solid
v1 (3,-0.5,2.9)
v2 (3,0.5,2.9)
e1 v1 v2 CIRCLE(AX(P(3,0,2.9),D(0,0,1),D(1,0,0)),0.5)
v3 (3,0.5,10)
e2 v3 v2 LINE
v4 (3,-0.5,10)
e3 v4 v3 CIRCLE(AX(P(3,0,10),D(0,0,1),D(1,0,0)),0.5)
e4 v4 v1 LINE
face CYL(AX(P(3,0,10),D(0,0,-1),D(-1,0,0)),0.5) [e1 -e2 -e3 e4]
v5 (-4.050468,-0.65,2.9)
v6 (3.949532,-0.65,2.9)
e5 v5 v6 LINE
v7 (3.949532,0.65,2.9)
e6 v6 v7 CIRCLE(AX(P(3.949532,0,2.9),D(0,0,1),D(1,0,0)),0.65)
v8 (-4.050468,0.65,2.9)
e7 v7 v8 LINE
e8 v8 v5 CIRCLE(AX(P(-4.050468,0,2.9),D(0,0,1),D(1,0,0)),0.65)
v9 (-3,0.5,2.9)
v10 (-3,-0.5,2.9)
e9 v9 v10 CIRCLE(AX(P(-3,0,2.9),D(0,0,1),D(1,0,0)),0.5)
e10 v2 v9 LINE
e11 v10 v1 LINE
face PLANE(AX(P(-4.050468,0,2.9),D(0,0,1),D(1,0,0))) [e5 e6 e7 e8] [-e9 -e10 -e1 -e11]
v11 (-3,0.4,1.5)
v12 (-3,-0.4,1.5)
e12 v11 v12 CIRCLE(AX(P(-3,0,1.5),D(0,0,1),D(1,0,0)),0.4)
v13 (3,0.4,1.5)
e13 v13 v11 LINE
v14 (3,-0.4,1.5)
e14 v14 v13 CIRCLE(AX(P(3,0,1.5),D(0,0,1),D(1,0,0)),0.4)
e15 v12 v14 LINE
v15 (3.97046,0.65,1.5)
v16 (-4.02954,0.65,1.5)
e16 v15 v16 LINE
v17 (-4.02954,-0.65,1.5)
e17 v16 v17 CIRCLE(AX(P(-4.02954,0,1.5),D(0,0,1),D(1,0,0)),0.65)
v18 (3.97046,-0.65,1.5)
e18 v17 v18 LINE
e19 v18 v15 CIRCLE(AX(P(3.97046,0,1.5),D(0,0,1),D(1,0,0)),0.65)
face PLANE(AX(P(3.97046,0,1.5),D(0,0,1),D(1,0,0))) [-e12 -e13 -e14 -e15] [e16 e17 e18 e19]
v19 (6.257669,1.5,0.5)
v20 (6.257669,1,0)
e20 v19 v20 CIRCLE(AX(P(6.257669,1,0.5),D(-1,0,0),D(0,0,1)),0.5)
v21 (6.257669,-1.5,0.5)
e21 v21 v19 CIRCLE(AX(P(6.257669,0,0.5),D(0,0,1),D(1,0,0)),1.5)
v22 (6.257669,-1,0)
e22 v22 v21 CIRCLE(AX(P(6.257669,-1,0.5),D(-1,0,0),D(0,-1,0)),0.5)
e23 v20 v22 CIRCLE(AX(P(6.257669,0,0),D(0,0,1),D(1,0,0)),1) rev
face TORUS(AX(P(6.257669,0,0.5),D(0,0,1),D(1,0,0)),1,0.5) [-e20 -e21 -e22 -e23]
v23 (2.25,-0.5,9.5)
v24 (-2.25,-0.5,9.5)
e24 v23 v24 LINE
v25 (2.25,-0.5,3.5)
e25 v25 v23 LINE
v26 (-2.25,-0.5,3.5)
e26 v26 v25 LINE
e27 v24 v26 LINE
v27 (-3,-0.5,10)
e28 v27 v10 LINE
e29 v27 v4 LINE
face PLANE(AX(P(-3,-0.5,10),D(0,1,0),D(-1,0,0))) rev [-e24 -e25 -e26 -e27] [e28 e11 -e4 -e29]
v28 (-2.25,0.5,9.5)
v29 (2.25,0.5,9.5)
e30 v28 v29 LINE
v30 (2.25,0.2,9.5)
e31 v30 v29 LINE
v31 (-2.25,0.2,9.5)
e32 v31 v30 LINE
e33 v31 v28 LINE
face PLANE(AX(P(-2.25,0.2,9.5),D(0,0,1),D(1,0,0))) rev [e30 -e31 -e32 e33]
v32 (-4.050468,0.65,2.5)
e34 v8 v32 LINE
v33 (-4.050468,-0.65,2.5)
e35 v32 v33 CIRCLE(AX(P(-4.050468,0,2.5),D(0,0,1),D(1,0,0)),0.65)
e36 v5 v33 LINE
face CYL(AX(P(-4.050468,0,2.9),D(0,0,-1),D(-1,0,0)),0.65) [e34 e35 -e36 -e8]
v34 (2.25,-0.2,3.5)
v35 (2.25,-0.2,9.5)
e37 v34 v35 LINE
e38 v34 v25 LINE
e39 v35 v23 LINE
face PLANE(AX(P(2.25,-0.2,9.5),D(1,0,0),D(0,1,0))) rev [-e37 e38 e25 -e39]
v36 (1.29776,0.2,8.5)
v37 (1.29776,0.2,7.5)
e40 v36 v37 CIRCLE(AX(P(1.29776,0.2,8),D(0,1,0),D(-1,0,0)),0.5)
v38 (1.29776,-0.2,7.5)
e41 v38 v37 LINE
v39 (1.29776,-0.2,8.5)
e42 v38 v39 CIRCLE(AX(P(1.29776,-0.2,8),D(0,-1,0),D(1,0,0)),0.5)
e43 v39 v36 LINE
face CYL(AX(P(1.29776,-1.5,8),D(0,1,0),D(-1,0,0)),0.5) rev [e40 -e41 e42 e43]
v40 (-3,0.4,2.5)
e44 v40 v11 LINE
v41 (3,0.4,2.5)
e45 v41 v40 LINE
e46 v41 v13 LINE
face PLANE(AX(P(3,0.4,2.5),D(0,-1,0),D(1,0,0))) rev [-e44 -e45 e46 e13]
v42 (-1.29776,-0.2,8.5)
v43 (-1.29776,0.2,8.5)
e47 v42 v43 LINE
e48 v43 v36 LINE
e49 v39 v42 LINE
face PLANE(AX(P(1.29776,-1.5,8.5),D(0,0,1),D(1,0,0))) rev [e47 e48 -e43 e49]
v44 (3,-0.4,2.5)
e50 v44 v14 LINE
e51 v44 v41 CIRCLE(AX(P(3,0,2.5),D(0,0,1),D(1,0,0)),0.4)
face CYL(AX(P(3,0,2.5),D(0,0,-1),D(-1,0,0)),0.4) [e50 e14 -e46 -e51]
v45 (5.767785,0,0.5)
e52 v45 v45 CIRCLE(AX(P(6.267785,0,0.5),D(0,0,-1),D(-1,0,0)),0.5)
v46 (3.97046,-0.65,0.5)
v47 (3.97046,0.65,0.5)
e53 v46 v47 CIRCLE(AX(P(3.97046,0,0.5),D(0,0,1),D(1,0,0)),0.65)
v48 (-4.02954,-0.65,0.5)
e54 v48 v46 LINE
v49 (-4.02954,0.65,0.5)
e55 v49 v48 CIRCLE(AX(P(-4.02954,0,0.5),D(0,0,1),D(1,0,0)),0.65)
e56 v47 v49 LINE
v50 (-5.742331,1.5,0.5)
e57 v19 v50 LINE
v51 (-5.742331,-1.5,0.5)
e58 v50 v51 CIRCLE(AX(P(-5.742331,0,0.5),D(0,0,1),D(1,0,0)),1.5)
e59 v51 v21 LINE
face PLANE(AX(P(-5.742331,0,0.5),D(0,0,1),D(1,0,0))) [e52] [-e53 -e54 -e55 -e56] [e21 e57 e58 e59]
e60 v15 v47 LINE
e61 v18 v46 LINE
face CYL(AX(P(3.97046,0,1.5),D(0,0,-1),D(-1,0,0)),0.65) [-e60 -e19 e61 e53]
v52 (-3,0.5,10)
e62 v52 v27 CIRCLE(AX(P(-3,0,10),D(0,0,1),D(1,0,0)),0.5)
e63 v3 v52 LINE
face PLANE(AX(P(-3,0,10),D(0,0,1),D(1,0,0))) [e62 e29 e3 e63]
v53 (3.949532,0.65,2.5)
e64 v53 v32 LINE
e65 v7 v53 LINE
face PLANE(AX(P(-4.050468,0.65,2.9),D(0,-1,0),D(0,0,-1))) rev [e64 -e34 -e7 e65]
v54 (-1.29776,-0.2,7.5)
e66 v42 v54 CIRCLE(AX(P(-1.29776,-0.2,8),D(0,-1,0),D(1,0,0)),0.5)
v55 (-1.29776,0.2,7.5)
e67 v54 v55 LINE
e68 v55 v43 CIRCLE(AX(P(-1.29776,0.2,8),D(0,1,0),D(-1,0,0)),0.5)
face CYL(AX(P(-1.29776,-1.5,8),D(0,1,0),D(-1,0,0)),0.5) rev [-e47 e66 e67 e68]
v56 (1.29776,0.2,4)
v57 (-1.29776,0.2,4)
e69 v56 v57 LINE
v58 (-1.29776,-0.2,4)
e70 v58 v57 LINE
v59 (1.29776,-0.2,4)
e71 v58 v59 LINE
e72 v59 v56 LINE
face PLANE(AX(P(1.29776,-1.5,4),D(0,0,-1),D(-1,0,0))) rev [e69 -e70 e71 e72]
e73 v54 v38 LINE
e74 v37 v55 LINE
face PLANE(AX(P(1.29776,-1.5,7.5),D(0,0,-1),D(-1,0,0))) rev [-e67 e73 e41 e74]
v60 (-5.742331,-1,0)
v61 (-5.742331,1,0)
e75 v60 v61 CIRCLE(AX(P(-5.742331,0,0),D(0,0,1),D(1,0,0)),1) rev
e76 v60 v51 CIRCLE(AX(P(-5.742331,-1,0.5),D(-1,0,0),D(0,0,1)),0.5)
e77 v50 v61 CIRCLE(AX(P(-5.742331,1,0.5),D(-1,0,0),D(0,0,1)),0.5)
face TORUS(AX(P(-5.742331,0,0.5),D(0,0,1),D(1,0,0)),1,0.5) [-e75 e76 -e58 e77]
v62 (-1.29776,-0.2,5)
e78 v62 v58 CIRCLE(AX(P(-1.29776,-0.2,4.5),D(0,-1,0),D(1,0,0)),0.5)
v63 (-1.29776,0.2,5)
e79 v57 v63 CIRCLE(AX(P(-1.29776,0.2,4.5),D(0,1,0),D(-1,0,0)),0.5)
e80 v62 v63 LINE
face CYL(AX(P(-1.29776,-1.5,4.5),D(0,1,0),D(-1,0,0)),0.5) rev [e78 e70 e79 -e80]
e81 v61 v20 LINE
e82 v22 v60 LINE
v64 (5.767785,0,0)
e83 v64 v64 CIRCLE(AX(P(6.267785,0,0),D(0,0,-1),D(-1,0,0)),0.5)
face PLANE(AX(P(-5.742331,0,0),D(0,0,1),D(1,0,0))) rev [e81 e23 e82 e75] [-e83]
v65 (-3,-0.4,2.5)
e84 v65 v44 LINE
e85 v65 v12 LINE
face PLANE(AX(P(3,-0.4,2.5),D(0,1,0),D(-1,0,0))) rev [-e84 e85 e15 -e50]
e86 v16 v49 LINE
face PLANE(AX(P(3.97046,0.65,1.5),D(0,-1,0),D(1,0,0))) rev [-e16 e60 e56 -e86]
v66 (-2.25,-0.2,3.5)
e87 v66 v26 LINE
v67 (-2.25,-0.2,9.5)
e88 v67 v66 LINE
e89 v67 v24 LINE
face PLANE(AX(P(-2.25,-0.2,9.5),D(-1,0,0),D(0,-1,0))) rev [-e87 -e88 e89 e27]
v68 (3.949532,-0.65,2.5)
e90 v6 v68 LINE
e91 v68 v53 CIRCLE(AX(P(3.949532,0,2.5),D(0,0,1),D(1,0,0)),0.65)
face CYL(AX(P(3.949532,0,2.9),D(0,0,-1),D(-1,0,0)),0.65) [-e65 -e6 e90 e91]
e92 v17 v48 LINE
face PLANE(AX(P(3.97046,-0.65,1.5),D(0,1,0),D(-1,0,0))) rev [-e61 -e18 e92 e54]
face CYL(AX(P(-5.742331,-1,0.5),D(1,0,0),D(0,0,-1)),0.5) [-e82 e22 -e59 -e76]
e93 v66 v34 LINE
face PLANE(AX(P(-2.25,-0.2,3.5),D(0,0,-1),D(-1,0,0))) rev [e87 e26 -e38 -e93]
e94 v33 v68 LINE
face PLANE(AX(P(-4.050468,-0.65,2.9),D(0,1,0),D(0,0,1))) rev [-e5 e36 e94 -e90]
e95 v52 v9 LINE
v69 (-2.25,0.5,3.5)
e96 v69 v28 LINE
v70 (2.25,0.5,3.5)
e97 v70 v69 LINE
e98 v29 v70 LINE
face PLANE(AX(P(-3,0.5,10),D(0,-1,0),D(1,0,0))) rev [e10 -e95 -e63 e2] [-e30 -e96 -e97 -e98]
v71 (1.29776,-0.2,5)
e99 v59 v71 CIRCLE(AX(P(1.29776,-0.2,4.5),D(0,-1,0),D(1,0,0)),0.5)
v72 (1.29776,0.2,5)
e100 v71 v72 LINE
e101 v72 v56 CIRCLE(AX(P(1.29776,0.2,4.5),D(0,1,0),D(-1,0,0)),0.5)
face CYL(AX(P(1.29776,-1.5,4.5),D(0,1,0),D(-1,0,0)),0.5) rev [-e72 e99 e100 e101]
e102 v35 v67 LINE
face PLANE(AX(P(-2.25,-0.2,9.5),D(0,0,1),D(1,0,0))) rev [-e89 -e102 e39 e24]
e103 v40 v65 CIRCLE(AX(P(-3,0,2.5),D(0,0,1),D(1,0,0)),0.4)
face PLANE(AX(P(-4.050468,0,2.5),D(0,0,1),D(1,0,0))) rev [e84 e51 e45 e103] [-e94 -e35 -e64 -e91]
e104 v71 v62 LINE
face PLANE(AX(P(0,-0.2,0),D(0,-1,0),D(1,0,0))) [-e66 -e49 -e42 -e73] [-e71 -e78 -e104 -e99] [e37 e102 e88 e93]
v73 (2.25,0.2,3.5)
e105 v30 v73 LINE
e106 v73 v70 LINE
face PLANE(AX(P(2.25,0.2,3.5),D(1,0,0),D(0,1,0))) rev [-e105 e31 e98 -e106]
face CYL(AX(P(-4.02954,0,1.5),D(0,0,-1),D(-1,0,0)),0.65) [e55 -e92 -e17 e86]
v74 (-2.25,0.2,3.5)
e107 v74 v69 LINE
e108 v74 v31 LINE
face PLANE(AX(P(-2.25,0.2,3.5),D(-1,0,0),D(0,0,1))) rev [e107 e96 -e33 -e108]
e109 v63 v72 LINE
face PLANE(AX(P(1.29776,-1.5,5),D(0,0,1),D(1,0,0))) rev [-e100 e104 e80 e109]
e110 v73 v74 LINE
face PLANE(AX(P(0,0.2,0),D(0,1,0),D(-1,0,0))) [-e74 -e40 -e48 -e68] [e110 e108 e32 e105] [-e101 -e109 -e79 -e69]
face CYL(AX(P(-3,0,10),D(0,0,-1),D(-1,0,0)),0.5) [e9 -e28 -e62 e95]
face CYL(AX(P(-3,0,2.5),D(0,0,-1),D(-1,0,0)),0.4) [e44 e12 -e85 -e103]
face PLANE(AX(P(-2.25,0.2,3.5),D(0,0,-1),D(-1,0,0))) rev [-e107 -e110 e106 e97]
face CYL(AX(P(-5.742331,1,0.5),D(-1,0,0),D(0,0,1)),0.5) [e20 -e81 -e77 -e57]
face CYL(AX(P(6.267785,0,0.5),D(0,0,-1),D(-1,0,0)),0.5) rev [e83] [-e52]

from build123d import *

# Parameters (mm, degrees)
EXTRUDE_2_DEPTH     = 0.5
SKETCH_6_R          = 0.5
CUT_EXTRUDE_1_DEPTH = 8.917160087
EXTRUDE_3_DEPTH     = 1
EXTRUDE_4_DEPTH     = 1
EXTRUDE_5_DEPTH     = 0.4
EXTRUDE_6_DEPTH     = 7.1
SKETCH_11_W         = 4.5
SKETCH_11_H         = 6
CUT_EXTRUDE_2_DEPTH = 0.3
SKETCH_13_W         = 4.5
SKETCH_13_H         = 6
CUT_EXTRUDE_3_DEPTH = 0.3
CUT_EXTRUDE_4_DEPTH = 13.769942202
FILLET_2_R          = 0.5


with BuildPart() as part:
    # 草图5 → 凸台-拉伸2 (new body)
    with BuildSketch(Plane.XY):
        with BuildLine():
            Line((-5.742331288, 1.5), (6.257668712, 1.5))
            ThreePointArc((6.257668712, 1.5), (7.757668712, 0), (6.257668712, -1.5))
            Line((6.257668712, -1.5), (-5.742331288, -1.5))
            ThreePointArc((-5.742331288, -1.5), (-7.242331288, 0), (-5.742331288, 1.5))
        make_face()
    extrude(amount=EXTRUDE_2_DEPTH)

    # 草图6 → 切除-拉伸1 (cut, through all)
    with BuildSketch(Plane(origin=(0, 0, 0), x_dir=(-1, 0, 0), z_dir=(0, 0, -1))):
        with Locations((-6.26778509, 0)):
            Circle(SKETCH_6_R)
    extrude(amount=-CUT_EXTRUDE_1_DEPTH, mode=Mode.SUBTRACT)

    # 草图7 → 凸台-拉伸3 (add)
    with BuildSketch(Plane.XY.offset(0.5)):
        with BuildLine():
            Line((3.97045961, -0.65), (-4.02954039, -0.65))
            ThreePointArc((-4.02954039, -0.65), (-4.67954039, 0), (-4.02954039, 0.65))
            Line((-4.02954039, 0.65), (3.97045961, 0.65))
            ThreePointArc((3.97045961, 0.65), (4.62045961, 0), (3.97045961, -0.65))
        make_face()
    extrude(amount=EXTRUDE_3_DEPTH)

    # 草图8 → 凸台-拉伸4 (add)
    with BuildSketch(Plane.XY.offset(1.5)):
        with BuildLine():
            Line((3, -0.4), (-3, -0.4))
            ThreePointArc((-3, -0.4), (-3.4, 0), (-3, 0.4))
            Line((-3, 0.4), (3, 0.4))
            ThreePointArc((3, 0.4), (3.4, 0), (3, -0.4))
        make_face()
    extrude(amount=EXTRUDE_4_DEPTH)

    # 草图9 → 凸台-拉伸5 (add)
    with BuildSketch(Plane.XY.offset(2.5)):
        with BuildLine():
            Line((-4.050467807, 0.65), (3.949532193, 0.65))
            ThreePointArc((3.949532193, 0.65), (4.599532193, 0), (3.949532193, -0.65))
            Line((3.949532193, -0.65), (-4.050467807, -0.65))
            ThreePointArc((-4.050467807, -0.65), (-4.700467807, 0), (-4.050467807, 0.65))
        make_face()
    extrude(amount=EXTRUDE_5_DEPTH)

    # 草图10 → 凸台-拉伸6 (add)
    with BuildSketch(Plane.XY.offset(2.9)):
        with BuildLine():
            Line((-3, 0.5), (3, 0.5))
            ThreePointArc((3, 0.5), (3.5, 0), (3, -0.5))
            Line((3, -0.5), (-3, -0.5))
            ThreePointArc((-3, -0.5), (-3.5, 0), (-3, 0.5))
        make_face()
    extrude(amount=EXTRUDE_6_DEPTH)

    # 草图11 → 切除-拉伸2 (cut)
    with BuildSketch(Plane(origin=(0, -0.5, 0), x_dir=(-1, 0, 0), z_dir=(0, -1, 0))):
        with Locations((0, -6.5)):
            Rectangle(SKETCH_11_W, SKETCH_11_H)
    extrude(amount=-CUT_EXTRUDE_2_DEPTH, mode=Mode.SUBTRACT)

    # 草图13 → 切除-拉伸3 (cut)
    with BuildSketch(Plane(origin=(0, 0.5, 0), x_dir=(1, 0, 0), z_dir=(0, 1, 0))):
        with Locations((0, -6.5)):
            Rectangle(SKETCH_13_W, SKETCH_13_H)
    extrude(amount=-CUT_EXTRUDE_3_DEPTH, mode=Mode.SUBTRACT)

    # 草图14 → 切除-拉伸4 (cut, through all)
    with BuildSketch(Plane(origin=(0, 0.2, 0), x_dir=(1, 0, 0), z_dir=(0, 1, 0))):
        with BuildLine():
            Line((1.297759643, -5), (-1.297759643, -5))
            ThreePointArc((-1.297759643, -5), (-1.797759643, -4.5), (-1.297759643, -4))
            Line((-1.297759643, -4), (1.297759643, -4))
            ThreePointArc((1.297759643, -4), (1.797759643, -4.5), (1.297759643, -5))
        make_face()
        with BuildLine():
            Line((1.297759643, -8.5), (-1.297759643, -8.5))
            ThreePointArc((-1.297759643, -8.5), (-1.797759643, -8), (-1.297759643, -7.5))
            Line((-1.297759643, -7.5), (1.297759643, -7.5))
            ThreePointArc((1.297759643, -7.5), (1.797759643, -8), (1.297759643, -8.5))
        make_face()
    extrude(amount=-CUT_EXTRUDE_4_DEPTH, mode=Mode.SUBTRACT)

    # 圆角2
    fillet_2_edges = [part.edges().sort_by_distance(p)[0] for p in [
        (-7.242331288, 0, 0),
        (0.257668712, 1.5, 0),
        (7.757668712, 0, 0),
        (0.257668712, -1.5, 0),
    ]]
    fillet(fillet_2_edges, radius=FILLET_2_R - 0.0001)  # a hair under: the kernel refuses the full size


solid = part.part
